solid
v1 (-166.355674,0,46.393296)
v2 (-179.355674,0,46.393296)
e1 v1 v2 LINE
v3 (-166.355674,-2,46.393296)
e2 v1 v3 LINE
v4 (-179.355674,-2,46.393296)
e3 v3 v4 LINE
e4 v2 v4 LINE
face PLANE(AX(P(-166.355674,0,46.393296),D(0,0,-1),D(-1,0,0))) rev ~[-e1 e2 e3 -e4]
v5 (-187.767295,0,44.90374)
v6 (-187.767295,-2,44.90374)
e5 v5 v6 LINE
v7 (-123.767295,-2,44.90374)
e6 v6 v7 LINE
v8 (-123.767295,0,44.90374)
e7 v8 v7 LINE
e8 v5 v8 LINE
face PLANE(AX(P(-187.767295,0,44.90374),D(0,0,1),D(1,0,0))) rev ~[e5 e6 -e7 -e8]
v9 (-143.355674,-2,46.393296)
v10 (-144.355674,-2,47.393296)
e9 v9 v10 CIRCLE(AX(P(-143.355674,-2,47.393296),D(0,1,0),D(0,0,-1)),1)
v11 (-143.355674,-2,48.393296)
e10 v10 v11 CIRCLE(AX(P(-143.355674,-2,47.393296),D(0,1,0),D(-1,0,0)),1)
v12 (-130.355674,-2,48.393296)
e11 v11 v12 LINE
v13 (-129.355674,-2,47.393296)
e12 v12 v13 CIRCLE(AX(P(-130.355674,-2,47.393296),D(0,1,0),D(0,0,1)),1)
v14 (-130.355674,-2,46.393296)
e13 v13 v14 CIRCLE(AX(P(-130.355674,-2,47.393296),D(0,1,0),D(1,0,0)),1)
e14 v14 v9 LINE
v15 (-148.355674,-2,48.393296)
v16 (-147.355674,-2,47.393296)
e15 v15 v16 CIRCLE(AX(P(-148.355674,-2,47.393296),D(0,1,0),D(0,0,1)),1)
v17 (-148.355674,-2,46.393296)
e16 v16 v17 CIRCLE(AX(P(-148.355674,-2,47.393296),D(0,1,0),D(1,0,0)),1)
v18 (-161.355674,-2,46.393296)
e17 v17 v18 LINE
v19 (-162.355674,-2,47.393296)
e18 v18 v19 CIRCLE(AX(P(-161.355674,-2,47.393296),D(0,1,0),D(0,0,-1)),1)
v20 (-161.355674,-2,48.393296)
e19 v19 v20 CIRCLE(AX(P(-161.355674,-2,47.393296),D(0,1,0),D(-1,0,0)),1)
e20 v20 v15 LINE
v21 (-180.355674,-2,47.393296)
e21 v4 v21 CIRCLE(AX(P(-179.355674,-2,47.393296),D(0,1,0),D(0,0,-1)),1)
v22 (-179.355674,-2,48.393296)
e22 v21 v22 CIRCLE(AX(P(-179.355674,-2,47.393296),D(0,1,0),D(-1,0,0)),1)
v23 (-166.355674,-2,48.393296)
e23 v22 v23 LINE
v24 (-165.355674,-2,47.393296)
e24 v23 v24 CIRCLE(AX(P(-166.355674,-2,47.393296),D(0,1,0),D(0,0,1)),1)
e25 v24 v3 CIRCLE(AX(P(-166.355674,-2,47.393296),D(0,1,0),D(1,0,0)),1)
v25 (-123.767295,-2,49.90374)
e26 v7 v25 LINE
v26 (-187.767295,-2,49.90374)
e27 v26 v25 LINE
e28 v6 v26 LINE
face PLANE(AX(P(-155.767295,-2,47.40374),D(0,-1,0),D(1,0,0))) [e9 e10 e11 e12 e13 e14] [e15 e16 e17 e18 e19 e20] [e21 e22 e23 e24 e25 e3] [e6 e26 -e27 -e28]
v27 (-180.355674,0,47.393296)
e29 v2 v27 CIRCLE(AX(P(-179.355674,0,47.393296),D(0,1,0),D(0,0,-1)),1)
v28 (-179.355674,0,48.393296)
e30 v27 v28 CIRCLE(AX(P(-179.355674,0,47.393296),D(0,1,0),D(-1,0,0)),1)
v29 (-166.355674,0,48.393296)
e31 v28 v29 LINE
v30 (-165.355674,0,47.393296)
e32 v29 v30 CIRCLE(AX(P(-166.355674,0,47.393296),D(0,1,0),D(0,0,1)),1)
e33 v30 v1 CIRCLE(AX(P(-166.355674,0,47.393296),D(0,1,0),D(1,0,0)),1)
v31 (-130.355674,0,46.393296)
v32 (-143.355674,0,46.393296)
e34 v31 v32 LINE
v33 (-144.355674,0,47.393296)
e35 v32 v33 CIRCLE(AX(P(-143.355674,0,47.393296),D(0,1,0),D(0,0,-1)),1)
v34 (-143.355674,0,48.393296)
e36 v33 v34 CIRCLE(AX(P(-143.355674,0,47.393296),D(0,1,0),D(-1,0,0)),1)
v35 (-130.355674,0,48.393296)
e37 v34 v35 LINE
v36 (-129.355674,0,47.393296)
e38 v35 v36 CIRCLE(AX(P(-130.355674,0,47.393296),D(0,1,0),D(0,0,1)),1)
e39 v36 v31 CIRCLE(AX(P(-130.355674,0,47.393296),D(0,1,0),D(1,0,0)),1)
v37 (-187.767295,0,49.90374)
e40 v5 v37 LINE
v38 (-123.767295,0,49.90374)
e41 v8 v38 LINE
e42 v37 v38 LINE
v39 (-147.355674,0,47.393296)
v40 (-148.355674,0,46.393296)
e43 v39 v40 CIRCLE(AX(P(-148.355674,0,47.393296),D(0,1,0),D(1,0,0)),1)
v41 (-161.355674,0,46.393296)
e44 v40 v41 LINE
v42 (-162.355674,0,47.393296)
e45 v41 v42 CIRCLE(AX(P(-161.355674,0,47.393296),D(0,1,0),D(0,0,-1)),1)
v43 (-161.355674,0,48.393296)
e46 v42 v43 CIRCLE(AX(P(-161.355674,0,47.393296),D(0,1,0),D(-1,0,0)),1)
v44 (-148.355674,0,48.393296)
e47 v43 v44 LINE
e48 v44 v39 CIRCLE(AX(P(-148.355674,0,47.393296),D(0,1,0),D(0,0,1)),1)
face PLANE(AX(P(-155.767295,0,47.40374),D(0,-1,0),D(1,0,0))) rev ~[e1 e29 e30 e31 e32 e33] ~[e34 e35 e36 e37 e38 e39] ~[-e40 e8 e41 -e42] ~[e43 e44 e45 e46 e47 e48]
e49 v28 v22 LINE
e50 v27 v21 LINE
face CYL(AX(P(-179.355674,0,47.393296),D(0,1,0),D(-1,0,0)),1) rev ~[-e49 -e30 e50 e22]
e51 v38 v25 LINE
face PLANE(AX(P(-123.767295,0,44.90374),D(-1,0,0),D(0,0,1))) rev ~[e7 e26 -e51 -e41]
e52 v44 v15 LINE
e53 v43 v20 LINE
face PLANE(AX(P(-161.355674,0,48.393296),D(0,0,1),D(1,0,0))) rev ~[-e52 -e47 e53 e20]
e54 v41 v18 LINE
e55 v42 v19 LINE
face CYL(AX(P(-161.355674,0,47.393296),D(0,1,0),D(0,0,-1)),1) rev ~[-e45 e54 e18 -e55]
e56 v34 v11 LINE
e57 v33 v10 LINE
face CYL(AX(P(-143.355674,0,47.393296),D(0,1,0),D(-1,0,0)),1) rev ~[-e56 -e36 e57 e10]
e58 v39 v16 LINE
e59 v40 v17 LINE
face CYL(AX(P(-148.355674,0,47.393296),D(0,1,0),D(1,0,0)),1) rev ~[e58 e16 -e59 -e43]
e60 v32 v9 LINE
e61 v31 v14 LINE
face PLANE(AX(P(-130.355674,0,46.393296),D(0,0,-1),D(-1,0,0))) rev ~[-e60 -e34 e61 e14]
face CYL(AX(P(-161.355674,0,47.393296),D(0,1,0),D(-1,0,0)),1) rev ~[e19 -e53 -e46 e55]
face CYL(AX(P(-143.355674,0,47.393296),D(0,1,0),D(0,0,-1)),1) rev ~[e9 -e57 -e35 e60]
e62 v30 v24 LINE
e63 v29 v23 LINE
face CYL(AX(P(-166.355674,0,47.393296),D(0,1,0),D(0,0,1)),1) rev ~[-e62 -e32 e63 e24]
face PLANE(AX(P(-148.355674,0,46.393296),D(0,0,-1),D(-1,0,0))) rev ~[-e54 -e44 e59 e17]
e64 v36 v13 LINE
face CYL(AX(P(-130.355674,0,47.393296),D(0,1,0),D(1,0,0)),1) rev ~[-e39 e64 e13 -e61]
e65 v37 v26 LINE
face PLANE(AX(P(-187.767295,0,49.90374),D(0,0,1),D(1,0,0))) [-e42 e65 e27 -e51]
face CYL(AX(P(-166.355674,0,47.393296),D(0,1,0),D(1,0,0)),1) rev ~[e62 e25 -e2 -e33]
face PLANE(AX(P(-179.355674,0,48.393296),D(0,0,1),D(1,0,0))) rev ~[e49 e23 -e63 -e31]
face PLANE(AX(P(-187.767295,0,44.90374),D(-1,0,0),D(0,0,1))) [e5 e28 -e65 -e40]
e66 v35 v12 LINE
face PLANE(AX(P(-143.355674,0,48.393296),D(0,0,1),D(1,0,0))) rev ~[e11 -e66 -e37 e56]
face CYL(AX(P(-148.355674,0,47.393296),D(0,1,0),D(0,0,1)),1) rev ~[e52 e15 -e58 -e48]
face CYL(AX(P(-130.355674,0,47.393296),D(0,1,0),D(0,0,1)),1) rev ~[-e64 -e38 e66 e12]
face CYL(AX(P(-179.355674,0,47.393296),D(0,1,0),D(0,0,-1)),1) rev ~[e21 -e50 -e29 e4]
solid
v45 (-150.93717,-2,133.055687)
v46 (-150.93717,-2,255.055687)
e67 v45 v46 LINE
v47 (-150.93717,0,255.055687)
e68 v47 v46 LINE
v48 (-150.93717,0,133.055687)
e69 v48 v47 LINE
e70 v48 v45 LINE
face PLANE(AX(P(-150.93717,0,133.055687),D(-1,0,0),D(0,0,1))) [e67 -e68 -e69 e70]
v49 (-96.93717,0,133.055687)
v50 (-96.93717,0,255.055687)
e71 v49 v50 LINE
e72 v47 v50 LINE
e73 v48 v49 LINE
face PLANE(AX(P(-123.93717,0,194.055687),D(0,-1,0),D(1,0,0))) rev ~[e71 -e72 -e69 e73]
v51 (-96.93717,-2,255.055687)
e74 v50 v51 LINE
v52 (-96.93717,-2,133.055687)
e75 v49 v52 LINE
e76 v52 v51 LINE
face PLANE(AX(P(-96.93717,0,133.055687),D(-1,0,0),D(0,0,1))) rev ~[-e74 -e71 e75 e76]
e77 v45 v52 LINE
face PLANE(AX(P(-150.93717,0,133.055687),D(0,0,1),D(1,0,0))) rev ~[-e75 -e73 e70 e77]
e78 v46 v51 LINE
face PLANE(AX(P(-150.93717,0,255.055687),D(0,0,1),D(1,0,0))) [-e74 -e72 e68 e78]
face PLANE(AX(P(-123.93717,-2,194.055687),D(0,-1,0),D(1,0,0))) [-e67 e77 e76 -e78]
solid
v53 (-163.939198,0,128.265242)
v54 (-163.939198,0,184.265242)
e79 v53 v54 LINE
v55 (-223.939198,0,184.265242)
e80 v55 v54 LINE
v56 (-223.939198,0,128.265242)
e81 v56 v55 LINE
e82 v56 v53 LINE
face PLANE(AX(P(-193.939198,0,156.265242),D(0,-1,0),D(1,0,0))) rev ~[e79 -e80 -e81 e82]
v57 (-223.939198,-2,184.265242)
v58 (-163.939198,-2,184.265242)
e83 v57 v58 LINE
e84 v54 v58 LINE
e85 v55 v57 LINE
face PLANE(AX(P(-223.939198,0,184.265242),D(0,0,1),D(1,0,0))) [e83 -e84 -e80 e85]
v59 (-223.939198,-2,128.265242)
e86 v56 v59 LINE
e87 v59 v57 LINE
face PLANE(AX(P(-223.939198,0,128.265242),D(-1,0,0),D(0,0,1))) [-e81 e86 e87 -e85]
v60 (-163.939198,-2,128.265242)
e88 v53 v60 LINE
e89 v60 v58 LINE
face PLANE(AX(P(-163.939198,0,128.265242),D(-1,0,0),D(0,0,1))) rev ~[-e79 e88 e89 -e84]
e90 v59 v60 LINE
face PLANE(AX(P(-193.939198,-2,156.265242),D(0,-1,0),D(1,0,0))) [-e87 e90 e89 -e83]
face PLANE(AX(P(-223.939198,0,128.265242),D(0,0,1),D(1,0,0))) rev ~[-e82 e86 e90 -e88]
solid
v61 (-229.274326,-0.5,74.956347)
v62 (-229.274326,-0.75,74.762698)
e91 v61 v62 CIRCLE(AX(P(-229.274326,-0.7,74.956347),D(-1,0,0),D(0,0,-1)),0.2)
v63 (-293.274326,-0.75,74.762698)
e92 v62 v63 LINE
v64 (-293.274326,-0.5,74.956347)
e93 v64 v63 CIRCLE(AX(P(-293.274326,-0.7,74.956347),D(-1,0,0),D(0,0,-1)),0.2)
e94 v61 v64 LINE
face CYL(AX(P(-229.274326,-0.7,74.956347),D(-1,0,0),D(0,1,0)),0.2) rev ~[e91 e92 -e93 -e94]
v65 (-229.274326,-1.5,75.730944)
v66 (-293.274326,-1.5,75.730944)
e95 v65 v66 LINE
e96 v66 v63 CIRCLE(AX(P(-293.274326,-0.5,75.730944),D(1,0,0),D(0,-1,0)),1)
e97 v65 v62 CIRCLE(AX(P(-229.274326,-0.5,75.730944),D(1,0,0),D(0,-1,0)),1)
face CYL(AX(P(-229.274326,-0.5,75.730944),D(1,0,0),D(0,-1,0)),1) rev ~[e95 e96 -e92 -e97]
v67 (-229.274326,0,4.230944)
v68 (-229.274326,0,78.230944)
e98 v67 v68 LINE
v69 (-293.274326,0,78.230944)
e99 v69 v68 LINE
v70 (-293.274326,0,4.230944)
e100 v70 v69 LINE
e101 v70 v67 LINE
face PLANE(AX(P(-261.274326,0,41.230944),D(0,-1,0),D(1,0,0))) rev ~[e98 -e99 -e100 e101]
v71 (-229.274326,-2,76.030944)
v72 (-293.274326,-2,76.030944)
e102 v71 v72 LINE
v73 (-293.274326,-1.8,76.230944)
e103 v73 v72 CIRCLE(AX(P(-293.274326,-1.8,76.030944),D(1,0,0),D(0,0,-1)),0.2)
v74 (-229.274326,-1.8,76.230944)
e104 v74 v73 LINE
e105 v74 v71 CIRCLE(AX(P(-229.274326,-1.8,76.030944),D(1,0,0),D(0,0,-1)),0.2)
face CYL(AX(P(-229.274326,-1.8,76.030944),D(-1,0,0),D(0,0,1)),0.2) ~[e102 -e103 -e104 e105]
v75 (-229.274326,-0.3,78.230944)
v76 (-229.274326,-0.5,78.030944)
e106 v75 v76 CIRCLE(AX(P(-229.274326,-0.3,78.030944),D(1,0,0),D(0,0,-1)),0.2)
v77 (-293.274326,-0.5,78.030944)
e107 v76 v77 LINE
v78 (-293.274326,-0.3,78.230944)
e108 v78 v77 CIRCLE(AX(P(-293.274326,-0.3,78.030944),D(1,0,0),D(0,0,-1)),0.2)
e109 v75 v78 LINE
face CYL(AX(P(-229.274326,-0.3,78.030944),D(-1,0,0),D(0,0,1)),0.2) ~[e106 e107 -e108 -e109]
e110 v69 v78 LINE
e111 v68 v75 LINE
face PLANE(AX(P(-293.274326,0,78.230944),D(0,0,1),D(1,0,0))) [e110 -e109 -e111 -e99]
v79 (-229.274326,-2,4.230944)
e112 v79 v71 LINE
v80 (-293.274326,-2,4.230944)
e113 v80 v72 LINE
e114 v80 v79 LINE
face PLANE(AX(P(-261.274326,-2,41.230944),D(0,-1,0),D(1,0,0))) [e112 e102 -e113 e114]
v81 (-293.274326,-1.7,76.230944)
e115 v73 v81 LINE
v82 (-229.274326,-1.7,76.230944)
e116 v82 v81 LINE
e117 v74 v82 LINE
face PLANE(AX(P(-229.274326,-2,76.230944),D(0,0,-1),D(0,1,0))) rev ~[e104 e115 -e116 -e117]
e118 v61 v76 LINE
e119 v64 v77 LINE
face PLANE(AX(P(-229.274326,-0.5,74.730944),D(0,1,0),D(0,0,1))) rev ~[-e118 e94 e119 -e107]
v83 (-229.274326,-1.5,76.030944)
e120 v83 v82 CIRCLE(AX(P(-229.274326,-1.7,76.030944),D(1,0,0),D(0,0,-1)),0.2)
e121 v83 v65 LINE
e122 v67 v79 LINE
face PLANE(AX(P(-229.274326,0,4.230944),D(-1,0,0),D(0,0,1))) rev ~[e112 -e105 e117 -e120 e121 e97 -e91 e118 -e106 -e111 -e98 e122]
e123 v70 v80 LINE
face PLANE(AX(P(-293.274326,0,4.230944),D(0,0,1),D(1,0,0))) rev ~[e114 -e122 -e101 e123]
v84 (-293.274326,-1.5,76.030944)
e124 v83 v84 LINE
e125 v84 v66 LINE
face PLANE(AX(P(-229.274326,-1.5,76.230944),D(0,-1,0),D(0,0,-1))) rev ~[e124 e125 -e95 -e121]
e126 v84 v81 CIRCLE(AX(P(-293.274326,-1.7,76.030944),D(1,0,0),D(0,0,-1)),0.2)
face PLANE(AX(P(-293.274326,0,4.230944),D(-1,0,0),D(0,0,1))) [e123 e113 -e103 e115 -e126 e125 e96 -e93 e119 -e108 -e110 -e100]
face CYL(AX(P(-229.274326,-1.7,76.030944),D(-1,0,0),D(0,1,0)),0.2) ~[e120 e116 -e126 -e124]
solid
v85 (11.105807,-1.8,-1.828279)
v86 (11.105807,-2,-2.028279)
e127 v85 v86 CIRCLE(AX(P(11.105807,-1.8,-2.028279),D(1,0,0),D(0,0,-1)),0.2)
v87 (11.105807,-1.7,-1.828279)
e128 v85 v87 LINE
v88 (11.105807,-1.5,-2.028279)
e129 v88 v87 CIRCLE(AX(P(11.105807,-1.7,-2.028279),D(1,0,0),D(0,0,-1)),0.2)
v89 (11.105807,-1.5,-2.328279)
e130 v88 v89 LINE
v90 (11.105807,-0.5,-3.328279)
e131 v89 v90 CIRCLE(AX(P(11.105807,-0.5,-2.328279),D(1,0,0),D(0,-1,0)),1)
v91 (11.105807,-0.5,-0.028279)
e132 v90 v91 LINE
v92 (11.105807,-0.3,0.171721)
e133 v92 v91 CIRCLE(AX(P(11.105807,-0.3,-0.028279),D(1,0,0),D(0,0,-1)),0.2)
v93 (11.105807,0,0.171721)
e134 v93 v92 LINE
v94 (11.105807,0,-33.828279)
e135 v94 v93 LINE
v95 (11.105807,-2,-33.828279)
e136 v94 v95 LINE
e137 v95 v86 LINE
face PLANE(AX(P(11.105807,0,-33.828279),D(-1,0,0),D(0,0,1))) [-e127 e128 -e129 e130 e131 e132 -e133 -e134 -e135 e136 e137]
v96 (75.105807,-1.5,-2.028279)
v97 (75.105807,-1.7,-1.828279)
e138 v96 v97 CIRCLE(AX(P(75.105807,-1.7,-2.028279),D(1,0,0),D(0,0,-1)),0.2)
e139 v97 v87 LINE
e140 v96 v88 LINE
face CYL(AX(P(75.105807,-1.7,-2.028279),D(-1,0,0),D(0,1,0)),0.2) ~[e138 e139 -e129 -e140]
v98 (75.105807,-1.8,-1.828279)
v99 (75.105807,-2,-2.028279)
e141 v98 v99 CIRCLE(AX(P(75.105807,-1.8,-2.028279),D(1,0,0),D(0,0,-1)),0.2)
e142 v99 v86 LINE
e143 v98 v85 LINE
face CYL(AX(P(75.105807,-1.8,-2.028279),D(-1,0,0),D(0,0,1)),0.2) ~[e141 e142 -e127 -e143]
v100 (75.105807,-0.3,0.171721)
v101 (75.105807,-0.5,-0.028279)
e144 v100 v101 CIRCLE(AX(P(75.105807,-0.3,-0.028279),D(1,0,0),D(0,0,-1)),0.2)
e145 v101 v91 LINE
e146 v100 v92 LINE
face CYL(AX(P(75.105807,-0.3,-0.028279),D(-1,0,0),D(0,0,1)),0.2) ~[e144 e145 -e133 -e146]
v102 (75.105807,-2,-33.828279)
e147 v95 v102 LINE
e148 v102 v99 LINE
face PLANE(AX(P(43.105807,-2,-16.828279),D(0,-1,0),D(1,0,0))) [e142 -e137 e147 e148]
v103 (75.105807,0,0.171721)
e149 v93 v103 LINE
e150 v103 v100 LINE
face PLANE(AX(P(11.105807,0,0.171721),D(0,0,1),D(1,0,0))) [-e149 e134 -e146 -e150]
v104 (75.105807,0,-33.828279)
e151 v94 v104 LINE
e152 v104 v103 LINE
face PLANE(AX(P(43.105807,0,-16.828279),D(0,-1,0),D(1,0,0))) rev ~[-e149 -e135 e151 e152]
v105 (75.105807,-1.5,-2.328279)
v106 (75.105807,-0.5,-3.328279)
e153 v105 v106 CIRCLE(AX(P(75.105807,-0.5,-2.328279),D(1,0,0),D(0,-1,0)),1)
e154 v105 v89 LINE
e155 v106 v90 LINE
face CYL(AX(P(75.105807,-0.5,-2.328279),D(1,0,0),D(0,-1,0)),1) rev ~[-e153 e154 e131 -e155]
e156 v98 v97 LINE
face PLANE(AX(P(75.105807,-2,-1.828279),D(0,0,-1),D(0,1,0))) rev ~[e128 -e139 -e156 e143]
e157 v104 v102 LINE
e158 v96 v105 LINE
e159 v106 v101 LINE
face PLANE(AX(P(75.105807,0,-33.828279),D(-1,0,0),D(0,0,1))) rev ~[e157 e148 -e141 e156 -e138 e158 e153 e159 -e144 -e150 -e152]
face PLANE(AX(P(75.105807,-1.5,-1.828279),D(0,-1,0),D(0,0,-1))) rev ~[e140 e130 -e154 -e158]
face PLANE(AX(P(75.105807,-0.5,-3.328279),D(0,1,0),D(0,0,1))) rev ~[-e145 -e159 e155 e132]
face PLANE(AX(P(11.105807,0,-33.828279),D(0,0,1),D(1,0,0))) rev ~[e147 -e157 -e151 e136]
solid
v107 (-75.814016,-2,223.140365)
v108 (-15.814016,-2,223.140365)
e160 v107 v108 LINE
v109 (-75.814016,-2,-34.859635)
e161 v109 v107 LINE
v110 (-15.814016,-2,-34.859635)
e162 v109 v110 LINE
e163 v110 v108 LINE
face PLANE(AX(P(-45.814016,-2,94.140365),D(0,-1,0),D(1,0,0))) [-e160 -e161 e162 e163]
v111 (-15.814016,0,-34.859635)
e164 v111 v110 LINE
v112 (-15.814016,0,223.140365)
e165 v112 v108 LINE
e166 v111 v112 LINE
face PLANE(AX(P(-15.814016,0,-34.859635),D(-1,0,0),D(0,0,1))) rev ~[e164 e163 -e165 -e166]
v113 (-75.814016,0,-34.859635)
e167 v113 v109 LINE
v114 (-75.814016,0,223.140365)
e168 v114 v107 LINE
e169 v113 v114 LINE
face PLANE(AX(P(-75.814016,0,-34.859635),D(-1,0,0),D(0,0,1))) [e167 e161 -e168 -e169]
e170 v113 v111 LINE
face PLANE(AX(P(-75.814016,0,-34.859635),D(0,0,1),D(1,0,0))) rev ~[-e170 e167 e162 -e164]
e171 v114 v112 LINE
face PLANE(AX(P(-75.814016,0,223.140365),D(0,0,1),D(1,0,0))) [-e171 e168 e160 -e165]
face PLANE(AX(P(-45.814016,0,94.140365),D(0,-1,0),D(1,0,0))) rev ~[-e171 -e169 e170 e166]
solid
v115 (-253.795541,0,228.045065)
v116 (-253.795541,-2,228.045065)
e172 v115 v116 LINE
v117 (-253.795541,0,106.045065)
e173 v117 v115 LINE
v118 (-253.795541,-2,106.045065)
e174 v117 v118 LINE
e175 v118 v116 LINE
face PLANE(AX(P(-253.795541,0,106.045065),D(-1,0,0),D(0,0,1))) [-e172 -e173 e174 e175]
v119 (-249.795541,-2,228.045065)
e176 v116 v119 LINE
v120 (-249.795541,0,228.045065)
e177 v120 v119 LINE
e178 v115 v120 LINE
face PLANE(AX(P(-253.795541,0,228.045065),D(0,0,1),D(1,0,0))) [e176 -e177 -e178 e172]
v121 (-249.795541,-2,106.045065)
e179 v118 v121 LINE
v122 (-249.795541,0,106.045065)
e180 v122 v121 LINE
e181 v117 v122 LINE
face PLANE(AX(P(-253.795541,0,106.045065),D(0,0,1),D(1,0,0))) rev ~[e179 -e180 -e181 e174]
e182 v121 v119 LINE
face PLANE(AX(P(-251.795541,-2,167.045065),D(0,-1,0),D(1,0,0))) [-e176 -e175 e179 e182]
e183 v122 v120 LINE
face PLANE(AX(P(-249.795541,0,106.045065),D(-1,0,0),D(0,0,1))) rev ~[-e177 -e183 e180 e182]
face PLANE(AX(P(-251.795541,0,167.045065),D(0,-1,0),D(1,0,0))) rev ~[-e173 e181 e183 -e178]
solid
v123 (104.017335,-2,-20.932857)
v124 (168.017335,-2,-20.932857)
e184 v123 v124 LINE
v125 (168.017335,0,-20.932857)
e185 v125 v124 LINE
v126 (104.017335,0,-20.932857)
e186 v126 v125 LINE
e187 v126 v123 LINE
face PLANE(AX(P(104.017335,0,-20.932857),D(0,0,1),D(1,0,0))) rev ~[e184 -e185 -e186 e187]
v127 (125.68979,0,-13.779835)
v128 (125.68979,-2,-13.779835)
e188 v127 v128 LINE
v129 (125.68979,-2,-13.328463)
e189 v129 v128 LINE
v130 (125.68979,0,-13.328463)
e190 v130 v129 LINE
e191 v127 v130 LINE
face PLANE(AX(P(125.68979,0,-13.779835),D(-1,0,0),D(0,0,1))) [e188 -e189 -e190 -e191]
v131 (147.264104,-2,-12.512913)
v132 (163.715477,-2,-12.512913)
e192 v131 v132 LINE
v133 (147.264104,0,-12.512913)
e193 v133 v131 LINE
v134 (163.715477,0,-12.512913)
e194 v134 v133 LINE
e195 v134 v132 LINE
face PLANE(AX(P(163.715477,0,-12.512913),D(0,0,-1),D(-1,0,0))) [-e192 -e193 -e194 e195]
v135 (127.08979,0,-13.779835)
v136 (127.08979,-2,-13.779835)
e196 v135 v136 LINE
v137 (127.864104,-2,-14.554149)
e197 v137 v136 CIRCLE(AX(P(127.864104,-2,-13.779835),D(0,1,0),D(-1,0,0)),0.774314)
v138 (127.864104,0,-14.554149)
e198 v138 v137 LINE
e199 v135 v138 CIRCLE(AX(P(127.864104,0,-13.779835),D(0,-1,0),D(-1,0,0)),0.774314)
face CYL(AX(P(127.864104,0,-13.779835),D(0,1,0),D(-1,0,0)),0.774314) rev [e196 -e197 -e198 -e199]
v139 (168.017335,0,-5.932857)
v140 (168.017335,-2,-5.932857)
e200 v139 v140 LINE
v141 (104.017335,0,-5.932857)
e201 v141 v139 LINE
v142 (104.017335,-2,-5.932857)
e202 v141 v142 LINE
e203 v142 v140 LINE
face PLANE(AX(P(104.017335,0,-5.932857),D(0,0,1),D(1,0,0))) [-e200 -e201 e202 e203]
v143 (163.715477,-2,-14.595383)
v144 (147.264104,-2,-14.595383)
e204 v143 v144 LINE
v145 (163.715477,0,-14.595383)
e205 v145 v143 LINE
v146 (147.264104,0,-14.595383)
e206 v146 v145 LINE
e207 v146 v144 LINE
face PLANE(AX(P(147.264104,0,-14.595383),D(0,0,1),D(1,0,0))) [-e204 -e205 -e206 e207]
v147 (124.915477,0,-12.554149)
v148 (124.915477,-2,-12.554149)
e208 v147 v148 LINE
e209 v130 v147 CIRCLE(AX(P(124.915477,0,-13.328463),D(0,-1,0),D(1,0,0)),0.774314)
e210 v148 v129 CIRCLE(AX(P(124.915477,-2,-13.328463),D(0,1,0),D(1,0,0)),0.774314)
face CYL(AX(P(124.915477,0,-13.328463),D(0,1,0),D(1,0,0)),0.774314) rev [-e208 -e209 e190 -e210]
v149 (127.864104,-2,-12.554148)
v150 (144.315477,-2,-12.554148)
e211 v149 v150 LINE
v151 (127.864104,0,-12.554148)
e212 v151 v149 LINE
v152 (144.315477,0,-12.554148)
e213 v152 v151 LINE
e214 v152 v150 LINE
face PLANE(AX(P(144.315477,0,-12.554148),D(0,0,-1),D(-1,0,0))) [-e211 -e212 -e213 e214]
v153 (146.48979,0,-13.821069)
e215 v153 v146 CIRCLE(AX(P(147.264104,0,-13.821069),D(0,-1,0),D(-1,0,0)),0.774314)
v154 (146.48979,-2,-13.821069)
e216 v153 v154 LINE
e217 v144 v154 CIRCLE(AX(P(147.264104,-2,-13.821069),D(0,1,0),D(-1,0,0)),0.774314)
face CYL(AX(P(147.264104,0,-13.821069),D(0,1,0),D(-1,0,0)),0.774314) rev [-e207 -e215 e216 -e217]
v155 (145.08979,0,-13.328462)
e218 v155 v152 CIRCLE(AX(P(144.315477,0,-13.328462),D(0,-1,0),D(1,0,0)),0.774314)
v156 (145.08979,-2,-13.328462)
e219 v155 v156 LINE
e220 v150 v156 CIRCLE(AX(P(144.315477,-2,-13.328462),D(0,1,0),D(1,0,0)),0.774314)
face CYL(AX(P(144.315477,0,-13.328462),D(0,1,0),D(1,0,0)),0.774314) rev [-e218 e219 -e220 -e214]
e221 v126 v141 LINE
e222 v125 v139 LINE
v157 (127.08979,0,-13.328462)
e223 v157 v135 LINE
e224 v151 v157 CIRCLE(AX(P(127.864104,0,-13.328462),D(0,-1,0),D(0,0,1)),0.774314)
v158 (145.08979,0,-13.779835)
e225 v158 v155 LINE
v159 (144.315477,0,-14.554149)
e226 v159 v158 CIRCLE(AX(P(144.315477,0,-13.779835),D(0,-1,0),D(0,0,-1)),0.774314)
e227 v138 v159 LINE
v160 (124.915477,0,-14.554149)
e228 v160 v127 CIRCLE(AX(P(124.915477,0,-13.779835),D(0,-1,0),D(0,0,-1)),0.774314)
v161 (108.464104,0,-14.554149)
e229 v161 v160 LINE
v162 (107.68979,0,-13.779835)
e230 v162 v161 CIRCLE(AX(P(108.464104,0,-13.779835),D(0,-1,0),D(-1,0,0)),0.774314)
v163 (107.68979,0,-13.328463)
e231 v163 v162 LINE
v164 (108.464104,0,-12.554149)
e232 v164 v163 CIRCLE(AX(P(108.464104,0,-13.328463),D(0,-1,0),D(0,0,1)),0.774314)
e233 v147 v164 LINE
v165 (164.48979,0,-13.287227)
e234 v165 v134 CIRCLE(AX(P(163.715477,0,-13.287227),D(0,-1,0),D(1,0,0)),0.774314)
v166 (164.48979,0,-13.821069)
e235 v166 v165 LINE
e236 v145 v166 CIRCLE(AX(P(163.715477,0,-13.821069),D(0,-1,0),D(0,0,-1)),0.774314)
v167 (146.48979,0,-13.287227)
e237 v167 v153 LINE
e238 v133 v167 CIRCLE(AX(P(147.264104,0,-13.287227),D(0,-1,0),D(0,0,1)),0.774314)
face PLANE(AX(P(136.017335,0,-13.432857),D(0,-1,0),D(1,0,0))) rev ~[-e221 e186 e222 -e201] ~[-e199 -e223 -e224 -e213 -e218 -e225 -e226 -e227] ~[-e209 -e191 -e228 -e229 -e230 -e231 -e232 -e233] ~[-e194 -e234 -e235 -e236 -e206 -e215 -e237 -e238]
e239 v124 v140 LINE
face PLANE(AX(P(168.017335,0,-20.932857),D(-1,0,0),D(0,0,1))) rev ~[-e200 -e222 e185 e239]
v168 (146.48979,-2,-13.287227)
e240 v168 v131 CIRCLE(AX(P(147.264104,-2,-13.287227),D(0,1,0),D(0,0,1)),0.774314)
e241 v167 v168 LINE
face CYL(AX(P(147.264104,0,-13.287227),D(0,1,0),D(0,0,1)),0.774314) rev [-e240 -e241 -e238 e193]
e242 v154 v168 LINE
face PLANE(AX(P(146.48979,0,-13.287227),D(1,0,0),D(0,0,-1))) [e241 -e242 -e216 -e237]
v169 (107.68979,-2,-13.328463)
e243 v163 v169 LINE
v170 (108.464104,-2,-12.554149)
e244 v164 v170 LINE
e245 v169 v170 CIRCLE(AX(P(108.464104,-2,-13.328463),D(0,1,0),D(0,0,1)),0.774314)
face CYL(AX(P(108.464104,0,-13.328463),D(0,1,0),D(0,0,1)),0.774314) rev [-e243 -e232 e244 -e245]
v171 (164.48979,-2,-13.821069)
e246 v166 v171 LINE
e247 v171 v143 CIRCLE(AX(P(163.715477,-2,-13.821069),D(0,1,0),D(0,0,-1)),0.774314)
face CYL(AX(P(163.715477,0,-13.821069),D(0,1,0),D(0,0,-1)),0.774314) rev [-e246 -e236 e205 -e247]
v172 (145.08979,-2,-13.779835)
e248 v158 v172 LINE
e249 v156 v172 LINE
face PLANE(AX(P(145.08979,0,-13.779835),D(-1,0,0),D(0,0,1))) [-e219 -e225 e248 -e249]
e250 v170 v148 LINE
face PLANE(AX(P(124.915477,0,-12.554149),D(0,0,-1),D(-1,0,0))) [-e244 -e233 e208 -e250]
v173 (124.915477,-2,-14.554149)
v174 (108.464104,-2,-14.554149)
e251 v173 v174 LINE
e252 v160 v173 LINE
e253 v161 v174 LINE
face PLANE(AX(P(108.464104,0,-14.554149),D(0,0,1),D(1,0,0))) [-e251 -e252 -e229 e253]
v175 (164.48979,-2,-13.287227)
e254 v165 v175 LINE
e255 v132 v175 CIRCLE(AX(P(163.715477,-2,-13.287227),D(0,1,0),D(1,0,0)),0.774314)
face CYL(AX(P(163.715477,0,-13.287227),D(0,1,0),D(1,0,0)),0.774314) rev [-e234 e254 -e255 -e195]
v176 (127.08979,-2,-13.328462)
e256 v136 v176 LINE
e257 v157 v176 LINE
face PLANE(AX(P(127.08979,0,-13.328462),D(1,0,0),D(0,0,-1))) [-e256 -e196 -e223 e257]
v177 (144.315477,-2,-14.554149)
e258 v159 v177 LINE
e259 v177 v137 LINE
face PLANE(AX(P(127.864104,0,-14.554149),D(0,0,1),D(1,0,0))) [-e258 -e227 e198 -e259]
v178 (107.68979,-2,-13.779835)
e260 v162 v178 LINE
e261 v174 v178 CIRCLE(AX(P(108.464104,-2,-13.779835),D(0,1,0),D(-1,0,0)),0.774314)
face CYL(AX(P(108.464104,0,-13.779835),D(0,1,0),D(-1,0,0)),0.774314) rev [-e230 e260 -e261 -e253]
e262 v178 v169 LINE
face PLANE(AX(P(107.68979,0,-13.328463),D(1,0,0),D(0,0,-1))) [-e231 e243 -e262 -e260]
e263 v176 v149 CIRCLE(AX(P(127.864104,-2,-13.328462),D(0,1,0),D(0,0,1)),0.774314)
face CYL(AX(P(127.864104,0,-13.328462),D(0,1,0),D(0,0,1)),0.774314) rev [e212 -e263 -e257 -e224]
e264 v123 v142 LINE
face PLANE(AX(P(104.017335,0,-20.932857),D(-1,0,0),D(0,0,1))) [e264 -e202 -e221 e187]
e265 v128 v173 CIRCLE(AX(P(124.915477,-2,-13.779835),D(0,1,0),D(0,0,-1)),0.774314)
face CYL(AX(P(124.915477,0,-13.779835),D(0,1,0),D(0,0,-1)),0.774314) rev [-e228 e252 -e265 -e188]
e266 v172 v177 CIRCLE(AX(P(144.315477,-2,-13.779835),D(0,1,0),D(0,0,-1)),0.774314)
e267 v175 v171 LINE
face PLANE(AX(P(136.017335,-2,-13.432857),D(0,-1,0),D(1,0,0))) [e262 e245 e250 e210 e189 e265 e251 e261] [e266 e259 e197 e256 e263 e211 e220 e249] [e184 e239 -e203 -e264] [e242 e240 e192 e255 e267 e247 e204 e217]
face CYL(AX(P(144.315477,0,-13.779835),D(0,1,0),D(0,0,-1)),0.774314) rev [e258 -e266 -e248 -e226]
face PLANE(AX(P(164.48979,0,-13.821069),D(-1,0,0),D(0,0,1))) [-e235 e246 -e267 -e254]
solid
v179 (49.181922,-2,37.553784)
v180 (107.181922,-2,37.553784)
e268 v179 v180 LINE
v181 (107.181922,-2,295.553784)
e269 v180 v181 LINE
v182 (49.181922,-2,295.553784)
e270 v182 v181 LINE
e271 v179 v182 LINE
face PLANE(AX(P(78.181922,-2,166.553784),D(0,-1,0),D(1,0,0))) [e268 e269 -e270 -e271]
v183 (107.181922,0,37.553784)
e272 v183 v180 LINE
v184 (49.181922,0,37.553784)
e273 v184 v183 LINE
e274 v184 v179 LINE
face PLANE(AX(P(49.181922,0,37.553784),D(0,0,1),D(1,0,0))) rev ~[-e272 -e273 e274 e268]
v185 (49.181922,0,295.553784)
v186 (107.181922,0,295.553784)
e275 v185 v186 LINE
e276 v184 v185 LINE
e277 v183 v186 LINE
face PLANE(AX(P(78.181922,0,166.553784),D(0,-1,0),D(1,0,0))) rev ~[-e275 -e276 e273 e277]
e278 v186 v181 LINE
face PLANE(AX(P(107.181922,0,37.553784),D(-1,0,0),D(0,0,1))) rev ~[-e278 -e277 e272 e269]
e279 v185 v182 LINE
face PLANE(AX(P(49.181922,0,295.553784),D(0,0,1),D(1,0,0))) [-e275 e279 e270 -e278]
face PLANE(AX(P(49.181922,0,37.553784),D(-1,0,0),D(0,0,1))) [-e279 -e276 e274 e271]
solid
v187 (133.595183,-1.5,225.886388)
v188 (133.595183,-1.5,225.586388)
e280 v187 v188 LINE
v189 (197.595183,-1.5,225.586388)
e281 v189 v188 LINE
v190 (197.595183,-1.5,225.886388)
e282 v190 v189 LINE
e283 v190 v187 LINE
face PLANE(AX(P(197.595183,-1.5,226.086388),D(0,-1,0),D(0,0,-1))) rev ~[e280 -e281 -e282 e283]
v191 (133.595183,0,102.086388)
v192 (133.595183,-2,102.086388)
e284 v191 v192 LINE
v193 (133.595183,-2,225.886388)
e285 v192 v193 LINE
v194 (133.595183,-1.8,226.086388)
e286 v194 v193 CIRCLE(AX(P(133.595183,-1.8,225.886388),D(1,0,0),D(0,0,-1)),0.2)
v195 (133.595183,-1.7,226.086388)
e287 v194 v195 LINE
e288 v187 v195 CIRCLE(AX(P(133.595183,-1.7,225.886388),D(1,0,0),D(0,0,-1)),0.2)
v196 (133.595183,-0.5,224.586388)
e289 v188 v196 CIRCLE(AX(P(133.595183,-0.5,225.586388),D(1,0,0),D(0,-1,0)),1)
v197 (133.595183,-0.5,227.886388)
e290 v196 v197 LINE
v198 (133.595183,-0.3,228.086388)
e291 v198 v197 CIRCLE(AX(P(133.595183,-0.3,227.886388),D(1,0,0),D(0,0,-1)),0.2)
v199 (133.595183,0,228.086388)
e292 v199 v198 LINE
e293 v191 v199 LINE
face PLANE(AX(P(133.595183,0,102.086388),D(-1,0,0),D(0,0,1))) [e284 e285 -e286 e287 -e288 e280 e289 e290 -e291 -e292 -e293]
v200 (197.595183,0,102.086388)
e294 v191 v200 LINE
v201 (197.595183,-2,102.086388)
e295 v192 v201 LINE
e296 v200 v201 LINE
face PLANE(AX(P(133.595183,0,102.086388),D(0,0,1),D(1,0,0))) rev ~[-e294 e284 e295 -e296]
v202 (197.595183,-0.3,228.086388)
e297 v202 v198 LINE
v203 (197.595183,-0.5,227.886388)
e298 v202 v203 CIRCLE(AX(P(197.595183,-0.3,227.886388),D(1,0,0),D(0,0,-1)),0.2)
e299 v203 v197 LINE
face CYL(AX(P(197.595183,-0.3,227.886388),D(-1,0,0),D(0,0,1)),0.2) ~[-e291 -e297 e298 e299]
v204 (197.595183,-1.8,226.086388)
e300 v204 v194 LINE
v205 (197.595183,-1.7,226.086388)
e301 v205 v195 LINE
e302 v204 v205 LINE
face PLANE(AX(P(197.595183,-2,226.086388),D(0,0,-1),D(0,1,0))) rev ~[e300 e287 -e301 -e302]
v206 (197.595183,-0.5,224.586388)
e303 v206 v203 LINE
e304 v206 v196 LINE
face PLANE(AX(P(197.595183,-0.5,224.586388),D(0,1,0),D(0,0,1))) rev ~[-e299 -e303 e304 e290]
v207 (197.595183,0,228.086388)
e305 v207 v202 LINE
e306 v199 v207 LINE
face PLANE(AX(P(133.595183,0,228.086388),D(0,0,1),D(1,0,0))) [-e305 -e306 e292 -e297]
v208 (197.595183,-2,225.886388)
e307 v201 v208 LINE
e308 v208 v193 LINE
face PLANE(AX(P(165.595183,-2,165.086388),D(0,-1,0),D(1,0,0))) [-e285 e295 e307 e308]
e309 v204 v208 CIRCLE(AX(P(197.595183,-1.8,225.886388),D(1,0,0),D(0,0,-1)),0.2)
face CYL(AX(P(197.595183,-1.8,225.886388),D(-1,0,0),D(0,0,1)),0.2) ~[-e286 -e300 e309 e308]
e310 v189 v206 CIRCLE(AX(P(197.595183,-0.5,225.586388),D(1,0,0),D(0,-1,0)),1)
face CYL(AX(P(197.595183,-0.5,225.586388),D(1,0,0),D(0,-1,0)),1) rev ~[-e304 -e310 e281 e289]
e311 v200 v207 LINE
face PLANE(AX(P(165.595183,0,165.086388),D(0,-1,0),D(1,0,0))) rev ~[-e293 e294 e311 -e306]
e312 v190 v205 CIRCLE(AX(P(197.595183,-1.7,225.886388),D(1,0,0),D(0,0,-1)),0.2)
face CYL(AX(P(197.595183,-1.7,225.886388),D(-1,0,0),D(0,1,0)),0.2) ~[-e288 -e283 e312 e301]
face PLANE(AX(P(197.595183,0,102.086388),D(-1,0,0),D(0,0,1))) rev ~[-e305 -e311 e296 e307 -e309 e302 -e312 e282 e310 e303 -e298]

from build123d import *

# Parameters (mm, degrees)
F0_W      = 60
F0_H      = 258
F1_DEPTH  = 2
F2_W      = 58
F2_H      = 258
F3_DEPTH  = 2
F4_W      = 60
F4_H      = 56
F5_DEPTH  = 2
F6_W      = 64
F6_H      = 5
F7_DEPTH  = 2
F8_W      = 64
F8_H      = 74
F9_DEPTH  = 2
F10_W     = 64
F10_H     = 15
F11_DEPTH = 2
F13_DEPTH = 4
F14_W     = 64
F14_H     = 126
F15_DEPTH = 2
F16_W     = 64
F16_H     = 34
F17_DEPTH = 2
F18_W     = 54
F18_H     = 122
F19_DEPTH = 2
F20_W     = 4
F20_H     = 122
F21_DEPTH = 2
F23_DEPTH = 64
F24_R     = 0.2
F26_DEPTH = 64
F27_R     = 0.2
F29_DEPTH = 64
F30_R     = 0.2


with BuildPart() as f1:
    # F0 (on Front) → F1 (new body)
    with BuildSketch(Plane.XZ):
        with Locations((-45.8140162975, 94.1403650641)):
            Rectangle(F0_W, F0_H)
    extrude(amount=F1_DEPTH)


with BuildPart() as f3:
    # F2 (on Front) → F3 (new body)
    with BuildSketch(Plane.XZ):
        with Locations((78.1819216013, 166.5537835062)):
            Rectangle(F2_W, F2_H)
    extrude(amount=F3_DEPTH)


with BuildPart() as f5:
    # F4 (on Front) → F5 (new body)
    with BuildSketch(Plane.XZ):
        with Locations((-193.9391981363, 156.2652424913)):
            Rectangle(F4_W, F4_H)
    extrude(amount=F5_DEPTH)


with BuildPart() as f7:
    # F6 (on Front) → F7 (new body)
    with BuildSketch(Plane.XZ):
        with Locations((-155.7672946453, 47.4037402868)):
            Rectangle(F6_W, F6_H)
        with BuildLine():
            ThreePointArc((-180.3556742668, 47.3932959139), (-180.062781048, 48.1004026951), (-179.3556742668, 48.3932959139))
            Line((-179.3556742668, 48.3932959139), (-166.3556742668, 48.3932959139))
            ThreePointArc((-166.3556742668, 48.3932959139), (-165.6485674856, 48.1004026951), (-165.3556742668, 47.3932959139))
            ThreePointArc((-165.3556742668, 47.3932959139), (-165.6485674856, 46.6861891327), (-166.3556742668, 46.3932959139))
            Line((-166.3556742668, 46.3932959139), (-179.3556742668, 46.3932959139))
            ThreePointArc((-179.3556742668, 46.3932959139), (-180.062781048, 46.6861891327), (-180.3556742668, 47.3932959139))
        make_face(mode=Mode.SUBTRACT)
        with BuildLine():
            ThreePointArc((-162.3556742668, 47.3932959139), (-162.062781048, 48.1004026951), (-161.3556742668, 48.3932959139))
            Line((-161.3556742668, 48.3932959139), (-148.3556742668, 48.3932959139))
            ThreePointArc((-148.3556742668, 48.3932959139), (-147.6485674856, 48.1004026951), (-147.3556742668, 47.3932959139))
            ThreePointArc((-147.3556742668, 47.3932959139), (-147.6485674856, 46.6861891327), (-148.3556742668, 46.3932959139))
            Line((-148.3556742668, 46.3932959139), (-161.3556742668, 46.3932959139))
            ThreePointArc((-161.3556742668, 46.3932959139), (-162.062781048, 46.6861891327), (-162.3556742668, 47.3932959139))
        make_face(mode=Mode.SUBTRACT)
        with BuildLine():
            ThreePointArc((-144.3556742668, 47.3932959139), (-144.062781048, 48.1004026951), (-143.3556742668, 48.3932959139))
            Line((-143.3556742668, 48.3932959139), (-130.3556742668, 48.3932959139))
            ThreePointArc((-130.3556742668, 48.3932959139), (-129.6485674856, 48.1004026951), (-129.3556742668, 47.3932959139))
            ThreePointArc((-129.3556742668, 47.3932959139), (-129.6485674856, 46.6861891327), (-130.3556742668, 46.3932959139))
            Line((-130.3556742668, 46.3932959139), (-143.3556742668, 46.3932959139))
            ThreePointArc((-143.3556742668, 46.3932959139), (-144.062781048, 46.6861891327), (-144.3556742668, 47.3932959139))
        make_face(mode=Mode.SUBTRACT)
    extrude(amount=F7_DEPTH)


with BuildPart() as f9:
    # F8 (on Front) → F9 (new body)
    with BuildSketch(Plane.XZ):
        with Locations((-261.2743257284, 41.2309435084)):
            Rectangle(F8_W, F8_H)
    extrude(amount=F9_DEPTH)

    # F22 (on face) → F23 (cut)
    with BuildSketch(Plane.YZ.offset(-229.2743257284)):
        with BuildLine():
            Line((-0.5, 78.2309435084), (-2, 78.2309435084))
            Line((-2, 78.2309435084), (-2, 76.2309435084))
            Line((-2, 76.2309435084), (-1.5, 76.2309435084))
            Line((-1.5, 76.2309435084), (-1.5, 75.7309435084))
            ThreePointArc((-1.5, 75.7309435084), (-1.2071067812, 75.0238367273), (-0.5, 74.7309435084))
            Line((-0.5, 74.7309435084), (-0.5, 78.2309435084))
        make_face()
    extrude(amount=-F23_DEPTH, mode=Mode.SUBTRACT)

    # F24
    f24_edges = [f9.edges().sort_by_distance(p)[0] for p in [
        (-261.274326, -0.5, 78.230944),
        (-261.274326, -2, 76.230944),
        (-261.274326, -0.5, 74.730944),
        (-261.274326, -1.5, 76.230944),
    ]]
    fillet(f24_edges, radius=F24_R)


with BuildPart() as f11:
    # F10 (on Front) → F11 (new body)
    with BuildSketch(Plane.XZ):
        with Locations((136.0173345804, -13.4328569472)):
            Rectangle(F10_W, F10_H)
    extrude(amount=F11_DEPTH)

    # F12 (on Front) → F13 (cut)
    with BuildSketch(Plane.XZ):
        with BuildLine():
            Line((124.9154765659, -12.5541486777), (108.4641042895, -12.5541486777))
            ThreePointArc((108.4641042895, -12.5541486777), (107.916581707, -12.7809399571), (107.6897904277, -13.3284625395))
            Line((107.6897904277, -13.3284625395), (107.6897904277, -13.7798348159))
            ThreePointArc((107.6897904277, -13.7798348159), (107.916581707, -14.3273573984), (108.4641042895, -14.5541486777))
            Line((108.4641042895, -14.5541486777), (124.9154765659, -14.5541486777))
            ThreePointArc((124.9154765659, -14.5541486777), (125.4629991483, -14.3273573984), (125.6897904277, -13.7798348159))
            Line((125.6897904277, -13.7798348159), (125.6897904277, -13.3284625395))
            ThreePointArc((125.6897904277, -13.3284625395), (125.4629991483, -12.7809399571), (124.9154765659, -12.5541486777))
        make_face()
        with BuildLine():
            Line((144.3154765659, -12.5541477464), (127.8641042895, -12.5541477464))
            ThreePointArc((127.8641042895, -12.5541477464), (127.316581707, -12.7809390258), (127.0897904277, -13.3284616082))
            Line((127.0897904277, -13.3284616082), (127.0897904277, -13.7798348159))
            ThreePointArc((127.0897904277, -13.7798348159), (127.316581707, -14.3273573984), (127.8641042895, -14.5541486777))
            Line((127.8641042895, -14.5541486777), (144.3154765659, -14.5541486777))
            ThreePointArc((144.3154765659, -14.5541486777), (144.8629991483, -14.3273573984), (145.0897904277, -13.7798348159))
            Line((145.0897904277, -13.7798348159), (145.0897904277, -13.3284616082))
            ThreePointArc((145.0897904277, -13.3284616082), (144.8629991483, -12.7809390258), (144.3154765659, -12.5541477464))
        make_face()
        with BuildLine():
            Line((163.7154765659, -12.5129134394), (147.2641042895, -12.5129134394))
            ThreePointArc((147.2641042895, -12.5129134394), (146.716581707, -12.7397047188), (146.4897904277, -13.2872273012))
            Line((146.4897904277, -13.2872273012), (146.4897904277, -13.8210691229))
            ThreePointArc((146.4897904277, -13.8210691229), (146.716581707, -14.3685917054), (147.2641042895, -14.5953829847))
            Line((147.2641042895, -14.5953829847), (163.7154765659, -14.5953829847))
            ThreePointArc((163.7154765659, -14.5953829847), (164.2629991483, -14.3685917054), (164.4897904277, -13.8210691229))
            Line((164.4897904277, -13.8210691229), (164.4897904277, -13.2872273012))
            ThreePointArc((164.4897904277, -13.2872273012), (164.2629991483, -12.7397047188), (163.7154765659, -12.5129134394))
        make_face()
    extrude(amount=F13_DEPTH, mode=Mode.SUBTRACT)


with BuildPart() as f15:
    # F14 (on Front) → F15 (new body)
    with BuildSketch(Plane.XZ):
        with Locations((165.5951834917, 165.0863875747)):
            Rectangle(F14_W, F14_H)
    extrude(amount=F15_DEPTH)

    # F25 (on face) → F26 (cut)
    with BuildSketch(Plane.YZ.offset(197.5951834917)):
        with BuildLine():
            Line((-0.5, 228.0863875747), (-2, 228.0863875747))
            Line((-2, 228.0863875747), (-2, 226.0863875747))
            Line((-2, 226.0863875747), (-1.5, 226.0863875747))
            Line((-1.5, 226.0863875747), (-1.5, 225.5863875747))
            ThreePointArc((-1.5, 225.5863875747), (-1.2071067812, 224.8792807935), (-0.5, 224.5863875747))
            Line((-0.5, 224.5863875747), (-0.5, 228.0863875747))
        make_face()
    extrude(amount=-F26_DEPTH, mode=Mode.SUBTRACT)

    # F27
    f27_edges = [f15.edges().sort_by_distance(p)[0] for p in [
        (165.595183, -0.5, 228.086388),
        (165.595183, -2, 226.086388),
        (165.595183, -1.5, 226.086388),
    ]]
    fillet(f27_edges, radius=F27_R)


with BuildPart() as f17:
    # F16 (on Front) → F17 (new body)
    with BuildSketch(Plane.XZ):
        with Locations((43.1058065668, -16.8282787427)):
            Rectangle(F16_W, F16_H)
    extrude(amount=F17_DEPTH)

    # F28 (on face) → F29 (cut)
    with BuildSketch(Plane.YZ.offset(75.1058065668)):
        with BuildLine():
            Line((-0.5, 0.1717212573), (-2, 0.1717212573))
            Line((-2, 0.1717212573), (-2, -1.8282787427))
            Line((-2, -1.8282787427), (-1.5, -1.8282787427))
            Line((-1.5, -1.8282787427), (-1.5, -2.3282787427))
            ThreePointArc((-1.5, -2.3282787427), (-1.2071067812, -3.0353855239), (-0.5, -3.3282787427))
            Line((-0.5, -3.3282787427), (-0.5, 0.1717212573))
        make_face()
    extrude(amount=-F29_DEPTH, mode=Mode.SUBTRACT)

    # F30
    f30_edges = [f17.edges().sort_by_distance(p)[0] for p in [
        (43.105807, -0.5, 0.171721),
        (43.105807, -1.5, -1.828279),
        (43.105807, -2, -1.828279),
    ]]
    fillet(f30_edges, radius=F30_R)


with BuildPart() as f19:
    # F18 (on Front) → F19 (new body)
    with BuildSketch(Plane.XZ):
        with Locations((-123.9371697903, 194.0556869507)):
            Rectangle(F18_W, F18_H)
    extrude(amount=F19_DEPTH)


with BuildPart() as f21:
    # F20 (on Front) → F21 (new body)
    with BuildSketch(Plane.XZ):
        with Locations((-251.7955411673, 167.0450652838)):
            Rectangle(F20_W, F20_H)
    extrude(amount=F21_DEPTH)


solid = Compound([f1.part, f3.part, f5.part, f7.part, f9.part, f11.part, f15.part, f17.part, f19.part, f21.part])
